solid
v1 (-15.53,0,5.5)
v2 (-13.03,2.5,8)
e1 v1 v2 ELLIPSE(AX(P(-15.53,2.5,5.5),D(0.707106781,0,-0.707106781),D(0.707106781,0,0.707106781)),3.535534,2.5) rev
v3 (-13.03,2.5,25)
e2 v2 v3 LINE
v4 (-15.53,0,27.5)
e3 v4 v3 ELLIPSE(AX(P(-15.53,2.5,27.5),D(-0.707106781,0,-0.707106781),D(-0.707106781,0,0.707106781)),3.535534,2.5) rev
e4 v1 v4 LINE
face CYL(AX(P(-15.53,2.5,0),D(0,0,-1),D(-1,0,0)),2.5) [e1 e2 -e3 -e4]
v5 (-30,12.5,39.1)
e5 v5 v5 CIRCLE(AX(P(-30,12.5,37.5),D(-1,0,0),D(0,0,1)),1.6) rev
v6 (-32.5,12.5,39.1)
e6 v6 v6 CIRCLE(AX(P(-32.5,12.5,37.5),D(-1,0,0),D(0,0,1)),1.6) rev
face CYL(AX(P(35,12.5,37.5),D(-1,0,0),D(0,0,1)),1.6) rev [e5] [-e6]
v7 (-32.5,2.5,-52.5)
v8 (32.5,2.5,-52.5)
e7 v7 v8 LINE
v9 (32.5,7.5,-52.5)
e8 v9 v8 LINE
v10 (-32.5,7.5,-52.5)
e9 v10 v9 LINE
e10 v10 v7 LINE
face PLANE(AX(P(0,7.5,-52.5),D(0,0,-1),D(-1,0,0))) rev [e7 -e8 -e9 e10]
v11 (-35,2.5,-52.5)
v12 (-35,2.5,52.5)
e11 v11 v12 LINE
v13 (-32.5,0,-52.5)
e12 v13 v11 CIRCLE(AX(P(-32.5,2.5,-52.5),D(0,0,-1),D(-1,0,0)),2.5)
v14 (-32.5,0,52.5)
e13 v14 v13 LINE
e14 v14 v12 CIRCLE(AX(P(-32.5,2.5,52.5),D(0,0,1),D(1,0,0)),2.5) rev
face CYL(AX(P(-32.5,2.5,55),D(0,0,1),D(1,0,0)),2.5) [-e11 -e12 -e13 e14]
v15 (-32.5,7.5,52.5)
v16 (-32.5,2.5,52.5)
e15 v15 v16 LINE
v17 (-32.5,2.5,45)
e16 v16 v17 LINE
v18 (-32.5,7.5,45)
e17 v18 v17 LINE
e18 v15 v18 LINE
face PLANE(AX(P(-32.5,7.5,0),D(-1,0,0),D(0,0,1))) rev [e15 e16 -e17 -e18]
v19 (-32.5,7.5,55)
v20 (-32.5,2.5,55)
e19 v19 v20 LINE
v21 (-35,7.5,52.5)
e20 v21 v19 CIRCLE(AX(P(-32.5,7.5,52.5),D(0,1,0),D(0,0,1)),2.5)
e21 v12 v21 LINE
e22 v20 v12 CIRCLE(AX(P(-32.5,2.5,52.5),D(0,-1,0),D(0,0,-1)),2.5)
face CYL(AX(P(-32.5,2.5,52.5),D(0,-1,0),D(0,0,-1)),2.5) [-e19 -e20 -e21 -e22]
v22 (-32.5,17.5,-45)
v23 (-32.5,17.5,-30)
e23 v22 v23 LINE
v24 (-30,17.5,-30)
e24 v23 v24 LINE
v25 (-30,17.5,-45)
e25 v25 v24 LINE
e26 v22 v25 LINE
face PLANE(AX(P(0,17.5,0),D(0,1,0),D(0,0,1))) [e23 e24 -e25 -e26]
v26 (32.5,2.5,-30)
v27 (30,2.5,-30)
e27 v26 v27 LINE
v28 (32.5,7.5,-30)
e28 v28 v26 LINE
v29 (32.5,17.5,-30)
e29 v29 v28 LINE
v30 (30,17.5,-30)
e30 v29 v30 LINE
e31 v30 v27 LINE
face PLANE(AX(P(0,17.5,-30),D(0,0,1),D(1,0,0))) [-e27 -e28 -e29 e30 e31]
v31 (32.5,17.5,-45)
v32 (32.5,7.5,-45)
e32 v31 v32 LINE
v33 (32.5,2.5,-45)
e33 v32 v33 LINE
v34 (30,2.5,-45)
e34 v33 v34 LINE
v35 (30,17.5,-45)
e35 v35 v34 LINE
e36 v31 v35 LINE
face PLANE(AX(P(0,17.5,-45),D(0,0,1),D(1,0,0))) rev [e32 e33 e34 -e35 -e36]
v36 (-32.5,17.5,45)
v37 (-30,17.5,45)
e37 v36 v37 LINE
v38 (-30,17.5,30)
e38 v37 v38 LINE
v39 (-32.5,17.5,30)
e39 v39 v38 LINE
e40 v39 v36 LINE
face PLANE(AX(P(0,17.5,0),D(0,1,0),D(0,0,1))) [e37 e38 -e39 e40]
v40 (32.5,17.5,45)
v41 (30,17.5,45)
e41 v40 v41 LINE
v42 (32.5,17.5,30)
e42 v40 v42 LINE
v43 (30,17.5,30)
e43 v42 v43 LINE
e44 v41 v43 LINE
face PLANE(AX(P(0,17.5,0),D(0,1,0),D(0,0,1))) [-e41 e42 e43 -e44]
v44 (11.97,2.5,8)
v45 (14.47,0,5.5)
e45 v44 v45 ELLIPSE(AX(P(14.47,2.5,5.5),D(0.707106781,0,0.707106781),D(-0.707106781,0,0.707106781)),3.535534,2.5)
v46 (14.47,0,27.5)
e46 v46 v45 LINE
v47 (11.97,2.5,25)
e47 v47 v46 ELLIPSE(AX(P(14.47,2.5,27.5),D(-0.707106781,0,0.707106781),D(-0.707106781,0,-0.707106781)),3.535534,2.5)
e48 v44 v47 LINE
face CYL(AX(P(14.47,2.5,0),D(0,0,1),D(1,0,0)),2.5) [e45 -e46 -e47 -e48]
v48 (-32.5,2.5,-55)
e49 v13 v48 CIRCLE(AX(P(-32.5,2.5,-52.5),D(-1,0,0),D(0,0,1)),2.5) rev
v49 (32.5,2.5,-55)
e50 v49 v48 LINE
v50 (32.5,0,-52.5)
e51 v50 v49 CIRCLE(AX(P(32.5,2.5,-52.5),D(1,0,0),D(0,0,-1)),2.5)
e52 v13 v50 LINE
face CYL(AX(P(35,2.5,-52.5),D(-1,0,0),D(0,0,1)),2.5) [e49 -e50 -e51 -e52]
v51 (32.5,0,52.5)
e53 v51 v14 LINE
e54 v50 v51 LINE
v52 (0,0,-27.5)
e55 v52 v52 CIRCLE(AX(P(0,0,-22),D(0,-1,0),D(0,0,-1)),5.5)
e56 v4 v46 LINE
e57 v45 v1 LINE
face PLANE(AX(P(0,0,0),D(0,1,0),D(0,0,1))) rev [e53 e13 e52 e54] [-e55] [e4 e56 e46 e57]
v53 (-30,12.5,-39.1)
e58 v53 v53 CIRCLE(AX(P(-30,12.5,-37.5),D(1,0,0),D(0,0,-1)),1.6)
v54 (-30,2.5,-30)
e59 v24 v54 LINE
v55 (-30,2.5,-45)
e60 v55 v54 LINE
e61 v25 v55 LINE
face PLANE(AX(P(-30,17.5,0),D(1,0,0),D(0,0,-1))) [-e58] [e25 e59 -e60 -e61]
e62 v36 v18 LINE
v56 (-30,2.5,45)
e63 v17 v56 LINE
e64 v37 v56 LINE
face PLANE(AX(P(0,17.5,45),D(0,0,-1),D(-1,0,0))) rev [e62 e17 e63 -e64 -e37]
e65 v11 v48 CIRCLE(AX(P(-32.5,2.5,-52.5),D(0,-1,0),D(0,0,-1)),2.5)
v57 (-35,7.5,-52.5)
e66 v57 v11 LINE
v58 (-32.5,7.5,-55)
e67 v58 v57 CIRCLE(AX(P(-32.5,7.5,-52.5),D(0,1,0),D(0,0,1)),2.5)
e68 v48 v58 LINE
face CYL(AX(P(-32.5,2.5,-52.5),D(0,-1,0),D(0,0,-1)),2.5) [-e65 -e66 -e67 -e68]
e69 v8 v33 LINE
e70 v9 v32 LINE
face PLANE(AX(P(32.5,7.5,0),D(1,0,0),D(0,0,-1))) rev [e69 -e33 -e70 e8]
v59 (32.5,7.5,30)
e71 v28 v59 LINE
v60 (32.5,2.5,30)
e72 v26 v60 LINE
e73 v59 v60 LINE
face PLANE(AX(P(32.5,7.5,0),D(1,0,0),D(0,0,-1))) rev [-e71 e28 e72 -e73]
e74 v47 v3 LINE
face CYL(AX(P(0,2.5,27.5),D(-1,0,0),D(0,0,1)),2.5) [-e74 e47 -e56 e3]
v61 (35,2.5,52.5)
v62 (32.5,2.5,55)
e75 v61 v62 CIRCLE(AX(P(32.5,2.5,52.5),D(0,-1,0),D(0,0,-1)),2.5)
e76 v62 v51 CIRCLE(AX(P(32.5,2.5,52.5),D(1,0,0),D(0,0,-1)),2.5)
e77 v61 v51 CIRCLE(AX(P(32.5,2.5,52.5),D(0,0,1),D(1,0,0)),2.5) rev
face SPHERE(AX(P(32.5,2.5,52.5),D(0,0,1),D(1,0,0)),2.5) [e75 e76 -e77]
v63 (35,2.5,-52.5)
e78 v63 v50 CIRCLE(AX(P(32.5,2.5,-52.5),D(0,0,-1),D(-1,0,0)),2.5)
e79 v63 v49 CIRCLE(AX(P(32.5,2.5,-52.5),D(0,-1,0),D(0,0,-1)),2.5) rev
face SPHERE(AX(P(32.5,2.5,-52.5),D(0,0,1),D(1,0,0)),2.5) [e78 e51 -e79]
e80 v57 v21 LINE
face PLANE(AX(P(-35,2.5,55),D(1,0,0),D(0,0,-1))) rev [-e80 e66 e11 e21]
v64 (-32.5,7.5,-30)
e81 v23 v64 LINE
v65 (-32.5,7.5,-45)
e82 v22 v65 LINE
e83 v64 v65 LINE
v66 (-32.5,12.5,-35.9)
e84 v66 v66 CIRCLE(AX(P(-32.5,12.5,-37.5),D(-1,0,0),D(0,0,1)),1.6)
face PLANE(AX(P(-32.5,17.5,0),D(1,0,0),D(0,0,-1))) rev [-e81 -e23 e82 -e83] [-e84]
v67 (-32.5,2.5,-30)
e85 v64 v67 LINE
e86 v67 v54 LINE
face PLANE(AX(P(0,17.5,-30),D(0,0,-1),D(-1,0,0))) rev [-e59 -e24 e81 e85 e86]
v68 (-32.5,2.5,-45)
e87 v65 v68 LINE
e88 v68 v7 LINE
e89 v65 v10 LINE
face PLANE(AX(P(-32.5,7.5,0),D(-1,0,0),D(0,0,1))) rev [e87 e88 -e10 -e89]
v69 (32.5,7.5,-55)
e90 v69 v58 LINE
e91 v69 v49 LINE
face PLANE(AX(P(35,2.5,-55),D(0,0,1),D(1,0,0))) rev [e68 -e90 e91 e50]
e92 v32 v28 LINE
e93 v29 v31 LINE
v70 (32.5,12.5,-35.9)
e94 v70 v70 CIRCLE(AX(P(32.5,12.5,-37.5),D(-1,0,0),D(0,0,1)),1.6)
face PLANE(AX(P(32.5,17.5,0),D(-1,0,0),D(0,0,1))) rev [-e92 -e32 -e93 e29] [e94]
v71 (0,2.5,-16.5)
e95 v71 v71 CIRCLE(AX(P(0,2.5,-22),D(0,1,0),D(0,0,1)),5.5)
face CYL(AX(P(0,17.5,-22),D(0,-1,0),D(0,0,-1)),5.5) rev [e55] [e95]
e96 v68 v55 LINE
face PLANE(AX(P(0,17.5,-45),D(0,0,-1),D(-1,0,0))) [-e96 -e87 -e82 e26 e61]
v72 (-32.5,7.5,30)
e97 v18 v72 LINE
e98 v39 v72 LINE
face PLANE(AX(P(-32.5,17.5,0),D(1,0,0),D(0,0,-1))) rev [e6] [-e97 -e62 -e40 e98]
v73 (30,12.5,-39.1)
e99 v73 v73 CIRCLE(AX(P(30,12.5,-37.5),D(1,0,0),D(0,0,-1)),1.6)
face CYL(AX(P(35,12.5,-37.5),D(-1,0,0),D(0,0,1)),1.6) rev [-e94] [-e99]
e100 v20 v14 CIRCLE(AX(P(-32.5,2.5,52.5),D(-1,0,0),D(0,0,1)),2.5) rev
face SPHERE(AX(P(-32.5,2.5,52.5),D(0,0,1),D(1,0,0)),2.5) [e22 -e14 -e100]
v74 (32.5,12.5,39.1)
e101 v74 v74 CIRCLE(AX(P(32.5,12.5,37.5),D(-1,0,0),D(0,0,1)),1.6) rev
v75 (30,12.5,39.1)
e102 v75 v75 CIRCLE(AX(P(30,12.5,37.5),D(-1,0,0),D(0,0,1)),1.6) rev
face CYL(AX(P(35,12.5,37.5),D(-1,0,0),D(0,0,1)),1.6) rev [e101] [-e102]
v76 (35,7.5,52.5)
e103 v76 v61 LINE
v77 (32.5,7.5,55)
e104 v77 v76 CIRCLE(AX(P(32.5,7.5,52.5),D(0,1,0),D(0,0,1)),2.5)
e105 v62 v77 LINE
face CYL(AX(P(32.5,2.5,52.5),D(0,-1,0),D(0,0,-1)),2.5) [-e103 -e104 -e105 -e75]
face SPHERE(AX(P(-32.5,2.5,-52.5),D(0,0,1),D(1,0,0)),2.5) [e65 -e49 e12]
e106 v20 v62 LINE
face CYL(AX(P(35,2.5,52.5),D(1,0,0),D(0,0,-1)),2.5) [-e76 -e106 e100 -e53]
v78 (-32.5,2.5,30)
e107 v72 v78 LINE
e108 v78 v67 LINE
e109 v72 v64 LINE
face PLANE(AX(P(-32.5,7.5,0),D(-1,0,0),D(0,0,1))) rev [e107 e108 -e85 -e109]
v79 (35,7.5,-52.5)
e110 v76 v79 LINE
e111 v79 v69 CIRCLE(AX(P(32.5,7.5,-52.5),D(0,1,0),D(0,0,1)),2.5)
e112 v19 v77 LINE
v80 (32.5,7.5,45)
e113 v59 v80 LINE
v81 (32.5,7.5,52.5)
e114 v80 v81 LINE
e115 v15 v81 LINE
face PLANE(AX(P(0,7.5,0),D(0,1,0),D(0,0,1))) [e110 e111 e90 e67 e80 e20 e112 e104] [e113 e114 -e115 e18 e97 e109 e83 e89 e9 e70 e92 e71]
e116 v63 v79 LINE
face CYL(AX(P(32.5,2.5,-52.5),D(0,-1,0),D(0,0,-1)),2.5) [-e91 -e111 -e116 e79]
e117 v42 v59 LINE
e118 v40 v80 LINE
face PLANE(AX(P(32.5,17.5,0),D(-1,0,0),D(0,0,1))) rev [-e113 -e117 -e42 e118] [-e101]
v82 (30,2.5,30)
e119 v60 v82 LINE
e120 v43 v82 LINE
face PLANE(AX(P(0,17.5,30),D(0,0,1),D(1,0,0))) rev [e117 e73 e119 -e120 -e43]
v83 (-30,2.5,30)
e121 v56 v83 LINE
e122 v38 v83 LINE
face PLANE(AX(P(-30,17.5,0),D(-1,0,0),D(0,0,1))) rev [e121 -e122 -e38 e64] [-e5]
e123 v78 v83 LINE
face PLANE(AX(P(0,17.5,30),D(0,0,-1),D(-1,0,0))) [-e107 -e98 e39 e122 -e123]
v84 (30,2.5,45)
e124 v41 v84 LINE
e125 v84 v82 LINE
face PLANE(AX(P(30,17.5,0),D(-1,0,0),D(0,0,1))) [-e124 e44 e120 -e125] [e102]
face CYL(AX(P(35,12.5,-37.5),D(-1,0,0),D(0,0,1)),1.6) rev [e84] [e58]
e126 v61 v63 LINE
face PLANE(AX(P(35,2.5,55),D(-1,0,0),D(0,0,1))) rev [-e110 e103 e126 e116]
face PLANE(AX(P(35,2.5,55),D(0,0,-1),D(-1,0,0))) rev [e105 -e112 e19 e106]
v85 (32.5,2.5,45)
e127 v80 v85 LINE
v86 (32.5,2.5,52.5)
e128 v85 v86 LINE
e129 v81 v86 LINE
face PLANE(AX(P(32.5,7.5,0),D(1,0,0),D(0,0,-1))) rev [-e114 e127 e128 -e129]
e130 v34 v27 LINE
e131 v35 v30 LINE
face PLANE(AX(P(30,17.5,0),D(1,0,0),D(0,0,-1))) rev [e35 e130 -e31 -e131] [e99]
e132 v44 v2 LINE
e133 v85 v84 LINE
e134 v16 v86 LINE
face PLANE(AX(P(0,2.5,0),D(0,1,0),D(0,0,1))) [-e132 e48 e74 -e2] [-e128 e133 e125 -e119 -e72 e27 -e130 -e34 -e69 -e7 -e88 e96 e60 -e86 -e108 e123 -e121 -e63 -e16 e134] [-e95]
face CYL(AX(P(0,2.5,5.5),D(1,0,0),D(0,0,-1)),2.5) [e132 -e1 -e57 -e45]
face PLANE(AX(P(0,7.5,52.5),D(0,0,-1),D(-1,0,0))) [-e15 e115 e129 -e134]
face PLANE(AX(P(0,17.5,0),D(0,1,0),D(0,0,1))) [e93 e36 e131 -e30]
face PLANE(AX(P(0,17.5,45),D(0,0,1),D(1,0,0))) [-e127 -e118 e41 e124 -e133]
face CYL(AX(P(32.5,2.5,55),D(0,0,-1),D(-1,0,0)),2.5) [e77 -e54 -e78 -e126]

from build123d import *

# Parameters (mm, degrees)
SKETCH2_W           = 70
SKETCH2_H           = 110
BOSS_EXTRUDE1_DEPTH = 2.5
SKETCH3_W           = 65
SKETCH3_H           = 2.5
BOSS_EXTRUDE2_DEPTH = 5
SKETCH4_W           = 2.5
SKETCH4_H           = 15
BOSS_EXTRUDE3_DEPTH = 15
SKETCH6_R           = 1.6
CUT_EXTRUDE1_DEPTH  = 89.811598342
SKETCH7_W           = 25
SKETCH7_H           = 17
SKETCH7_R           = 5.5
CUT_EXTRUDE2_DEPTH  = 68.5
FILLET1_R           = 2.5
FILLET2_R           = 2.5


with BuildPart() as part:
    # Sketch2 → Boss-Extrude1 (new body)
    with BuildSketch(Plane(origin=(0, 0, 0), x_dir=(1, 0, 0), z_dir=(0, 1, 0))):
        Rectangle(SKETCH2_W, SKETCH2_H)
    extrude(amount=BOSS_EXTRUDE1_DEPTH)

    # Sketch3 → Boss-Extrude2 (add)
    with BuildSketch(Plane(origin=(0, 2.5, 0), x_dir=(1, 0, 0), z_dir=(0, 1, 0))):
        Polygon((-35, 55), (-35, -55), (-32.5, -55), (-32.5, -52.5), (-32.5, 52.5), (-32.5, 55), align=None)
        Polygon((35, 55), (-32.5, 55), (-32.5, 52.5), (32.5, 52.5), (35, 52.5), align=None)
        Polygon((32.5, -52.5), (32.5, -55), (35, -55), (35, 52.5), (32.5, 52.5), align=None)
        with Locations((0, -53.75)):
            Rectangle(SKETCH3_W, SKETCH3_H)
    extrude(amount=BOSS_EXTRUDE2_DEPTH)

    # Sketch4 → Boss-Extrude3 (add)
    with BuildSketch(Plane(origin=(0, 2.5, 0), x_dir=(1, 0, 0), z_dir=(0, 1, 0))):
        with Locations((-31.25, 37.5)):
            Rectangle(SKETCH4_W, SKETCH4_H)
        with Locations((31.25, 37.5)):
            Rectangle(SKETCH4_W, SKETCH4_H)
        with Locations((31.25, -37.5)):
            Rectangle(SKETCH4_W, SKETCH4_H)
        with Locations((-31.25, -37.5)):
            Rectangle(SKETCH4_W, SKETCH4_H)
    extrude(amount=BOSS_EXTRUDE3_DEPTH)

    # Sketch6 → Cut-Extrude1 (cut, through all)
    with BuildSketch(Plane.ZY.offset(32.5)):
        with Locations((-37.5, 12.5)):
            Circle(SKETCH6_R)
        with Locations((37.5, 12.5)):
            Circle(SKETCH6_R)
    extrude(amount=-CUT_EXTRUDE1_DEPTH, mode=Mode.SUBTRACT)

    # Sketch7 → Cut-Extrude2 (cut, through all)
    with BuildSketch(Plane.XZ):
        with Locations((-0.53, 16.5)):
            Rectangle(SKETCH7_W, SKETCH7_H)
        with Locations(Location((0, -22, 0), (0, 0, 270))):
            Circle(SKETCH7_R)
    extrude(amount=-CUT_EXTRUDE2_DEPTH, mode=Mode.SUBTRACT)

    # Fillet1
    fillet1_edges = [part.edges().sort_by_distance(p)[0] for p in [
        (-0.53, 0, 25),
        (11.97, 0, 16.5),
        (-0.53, 0, 8),
        (-13.03, 0, 16.5),
    ]]
    fillet(fillet1_edges, radius=FILLET1_R - 0.0001)  # a hair under: the kernel refuses the full size

    # Fillet2
    fillet2_edges = [part.edges().sort_by_distance(p)[0] for p in [
        (0, 0, -55),
        (35, 0, 0),
        (0, 0, 55),
        (-35, 0, 0),
        (-35, 3.75, -55),
        (35, 3.75, -55),
        (35, 3.75, 55),
        (-35, 3.75, 55),
    ]]
    fillet(fillet2_edges, radius=FILLET2_R)


solid = part.part
